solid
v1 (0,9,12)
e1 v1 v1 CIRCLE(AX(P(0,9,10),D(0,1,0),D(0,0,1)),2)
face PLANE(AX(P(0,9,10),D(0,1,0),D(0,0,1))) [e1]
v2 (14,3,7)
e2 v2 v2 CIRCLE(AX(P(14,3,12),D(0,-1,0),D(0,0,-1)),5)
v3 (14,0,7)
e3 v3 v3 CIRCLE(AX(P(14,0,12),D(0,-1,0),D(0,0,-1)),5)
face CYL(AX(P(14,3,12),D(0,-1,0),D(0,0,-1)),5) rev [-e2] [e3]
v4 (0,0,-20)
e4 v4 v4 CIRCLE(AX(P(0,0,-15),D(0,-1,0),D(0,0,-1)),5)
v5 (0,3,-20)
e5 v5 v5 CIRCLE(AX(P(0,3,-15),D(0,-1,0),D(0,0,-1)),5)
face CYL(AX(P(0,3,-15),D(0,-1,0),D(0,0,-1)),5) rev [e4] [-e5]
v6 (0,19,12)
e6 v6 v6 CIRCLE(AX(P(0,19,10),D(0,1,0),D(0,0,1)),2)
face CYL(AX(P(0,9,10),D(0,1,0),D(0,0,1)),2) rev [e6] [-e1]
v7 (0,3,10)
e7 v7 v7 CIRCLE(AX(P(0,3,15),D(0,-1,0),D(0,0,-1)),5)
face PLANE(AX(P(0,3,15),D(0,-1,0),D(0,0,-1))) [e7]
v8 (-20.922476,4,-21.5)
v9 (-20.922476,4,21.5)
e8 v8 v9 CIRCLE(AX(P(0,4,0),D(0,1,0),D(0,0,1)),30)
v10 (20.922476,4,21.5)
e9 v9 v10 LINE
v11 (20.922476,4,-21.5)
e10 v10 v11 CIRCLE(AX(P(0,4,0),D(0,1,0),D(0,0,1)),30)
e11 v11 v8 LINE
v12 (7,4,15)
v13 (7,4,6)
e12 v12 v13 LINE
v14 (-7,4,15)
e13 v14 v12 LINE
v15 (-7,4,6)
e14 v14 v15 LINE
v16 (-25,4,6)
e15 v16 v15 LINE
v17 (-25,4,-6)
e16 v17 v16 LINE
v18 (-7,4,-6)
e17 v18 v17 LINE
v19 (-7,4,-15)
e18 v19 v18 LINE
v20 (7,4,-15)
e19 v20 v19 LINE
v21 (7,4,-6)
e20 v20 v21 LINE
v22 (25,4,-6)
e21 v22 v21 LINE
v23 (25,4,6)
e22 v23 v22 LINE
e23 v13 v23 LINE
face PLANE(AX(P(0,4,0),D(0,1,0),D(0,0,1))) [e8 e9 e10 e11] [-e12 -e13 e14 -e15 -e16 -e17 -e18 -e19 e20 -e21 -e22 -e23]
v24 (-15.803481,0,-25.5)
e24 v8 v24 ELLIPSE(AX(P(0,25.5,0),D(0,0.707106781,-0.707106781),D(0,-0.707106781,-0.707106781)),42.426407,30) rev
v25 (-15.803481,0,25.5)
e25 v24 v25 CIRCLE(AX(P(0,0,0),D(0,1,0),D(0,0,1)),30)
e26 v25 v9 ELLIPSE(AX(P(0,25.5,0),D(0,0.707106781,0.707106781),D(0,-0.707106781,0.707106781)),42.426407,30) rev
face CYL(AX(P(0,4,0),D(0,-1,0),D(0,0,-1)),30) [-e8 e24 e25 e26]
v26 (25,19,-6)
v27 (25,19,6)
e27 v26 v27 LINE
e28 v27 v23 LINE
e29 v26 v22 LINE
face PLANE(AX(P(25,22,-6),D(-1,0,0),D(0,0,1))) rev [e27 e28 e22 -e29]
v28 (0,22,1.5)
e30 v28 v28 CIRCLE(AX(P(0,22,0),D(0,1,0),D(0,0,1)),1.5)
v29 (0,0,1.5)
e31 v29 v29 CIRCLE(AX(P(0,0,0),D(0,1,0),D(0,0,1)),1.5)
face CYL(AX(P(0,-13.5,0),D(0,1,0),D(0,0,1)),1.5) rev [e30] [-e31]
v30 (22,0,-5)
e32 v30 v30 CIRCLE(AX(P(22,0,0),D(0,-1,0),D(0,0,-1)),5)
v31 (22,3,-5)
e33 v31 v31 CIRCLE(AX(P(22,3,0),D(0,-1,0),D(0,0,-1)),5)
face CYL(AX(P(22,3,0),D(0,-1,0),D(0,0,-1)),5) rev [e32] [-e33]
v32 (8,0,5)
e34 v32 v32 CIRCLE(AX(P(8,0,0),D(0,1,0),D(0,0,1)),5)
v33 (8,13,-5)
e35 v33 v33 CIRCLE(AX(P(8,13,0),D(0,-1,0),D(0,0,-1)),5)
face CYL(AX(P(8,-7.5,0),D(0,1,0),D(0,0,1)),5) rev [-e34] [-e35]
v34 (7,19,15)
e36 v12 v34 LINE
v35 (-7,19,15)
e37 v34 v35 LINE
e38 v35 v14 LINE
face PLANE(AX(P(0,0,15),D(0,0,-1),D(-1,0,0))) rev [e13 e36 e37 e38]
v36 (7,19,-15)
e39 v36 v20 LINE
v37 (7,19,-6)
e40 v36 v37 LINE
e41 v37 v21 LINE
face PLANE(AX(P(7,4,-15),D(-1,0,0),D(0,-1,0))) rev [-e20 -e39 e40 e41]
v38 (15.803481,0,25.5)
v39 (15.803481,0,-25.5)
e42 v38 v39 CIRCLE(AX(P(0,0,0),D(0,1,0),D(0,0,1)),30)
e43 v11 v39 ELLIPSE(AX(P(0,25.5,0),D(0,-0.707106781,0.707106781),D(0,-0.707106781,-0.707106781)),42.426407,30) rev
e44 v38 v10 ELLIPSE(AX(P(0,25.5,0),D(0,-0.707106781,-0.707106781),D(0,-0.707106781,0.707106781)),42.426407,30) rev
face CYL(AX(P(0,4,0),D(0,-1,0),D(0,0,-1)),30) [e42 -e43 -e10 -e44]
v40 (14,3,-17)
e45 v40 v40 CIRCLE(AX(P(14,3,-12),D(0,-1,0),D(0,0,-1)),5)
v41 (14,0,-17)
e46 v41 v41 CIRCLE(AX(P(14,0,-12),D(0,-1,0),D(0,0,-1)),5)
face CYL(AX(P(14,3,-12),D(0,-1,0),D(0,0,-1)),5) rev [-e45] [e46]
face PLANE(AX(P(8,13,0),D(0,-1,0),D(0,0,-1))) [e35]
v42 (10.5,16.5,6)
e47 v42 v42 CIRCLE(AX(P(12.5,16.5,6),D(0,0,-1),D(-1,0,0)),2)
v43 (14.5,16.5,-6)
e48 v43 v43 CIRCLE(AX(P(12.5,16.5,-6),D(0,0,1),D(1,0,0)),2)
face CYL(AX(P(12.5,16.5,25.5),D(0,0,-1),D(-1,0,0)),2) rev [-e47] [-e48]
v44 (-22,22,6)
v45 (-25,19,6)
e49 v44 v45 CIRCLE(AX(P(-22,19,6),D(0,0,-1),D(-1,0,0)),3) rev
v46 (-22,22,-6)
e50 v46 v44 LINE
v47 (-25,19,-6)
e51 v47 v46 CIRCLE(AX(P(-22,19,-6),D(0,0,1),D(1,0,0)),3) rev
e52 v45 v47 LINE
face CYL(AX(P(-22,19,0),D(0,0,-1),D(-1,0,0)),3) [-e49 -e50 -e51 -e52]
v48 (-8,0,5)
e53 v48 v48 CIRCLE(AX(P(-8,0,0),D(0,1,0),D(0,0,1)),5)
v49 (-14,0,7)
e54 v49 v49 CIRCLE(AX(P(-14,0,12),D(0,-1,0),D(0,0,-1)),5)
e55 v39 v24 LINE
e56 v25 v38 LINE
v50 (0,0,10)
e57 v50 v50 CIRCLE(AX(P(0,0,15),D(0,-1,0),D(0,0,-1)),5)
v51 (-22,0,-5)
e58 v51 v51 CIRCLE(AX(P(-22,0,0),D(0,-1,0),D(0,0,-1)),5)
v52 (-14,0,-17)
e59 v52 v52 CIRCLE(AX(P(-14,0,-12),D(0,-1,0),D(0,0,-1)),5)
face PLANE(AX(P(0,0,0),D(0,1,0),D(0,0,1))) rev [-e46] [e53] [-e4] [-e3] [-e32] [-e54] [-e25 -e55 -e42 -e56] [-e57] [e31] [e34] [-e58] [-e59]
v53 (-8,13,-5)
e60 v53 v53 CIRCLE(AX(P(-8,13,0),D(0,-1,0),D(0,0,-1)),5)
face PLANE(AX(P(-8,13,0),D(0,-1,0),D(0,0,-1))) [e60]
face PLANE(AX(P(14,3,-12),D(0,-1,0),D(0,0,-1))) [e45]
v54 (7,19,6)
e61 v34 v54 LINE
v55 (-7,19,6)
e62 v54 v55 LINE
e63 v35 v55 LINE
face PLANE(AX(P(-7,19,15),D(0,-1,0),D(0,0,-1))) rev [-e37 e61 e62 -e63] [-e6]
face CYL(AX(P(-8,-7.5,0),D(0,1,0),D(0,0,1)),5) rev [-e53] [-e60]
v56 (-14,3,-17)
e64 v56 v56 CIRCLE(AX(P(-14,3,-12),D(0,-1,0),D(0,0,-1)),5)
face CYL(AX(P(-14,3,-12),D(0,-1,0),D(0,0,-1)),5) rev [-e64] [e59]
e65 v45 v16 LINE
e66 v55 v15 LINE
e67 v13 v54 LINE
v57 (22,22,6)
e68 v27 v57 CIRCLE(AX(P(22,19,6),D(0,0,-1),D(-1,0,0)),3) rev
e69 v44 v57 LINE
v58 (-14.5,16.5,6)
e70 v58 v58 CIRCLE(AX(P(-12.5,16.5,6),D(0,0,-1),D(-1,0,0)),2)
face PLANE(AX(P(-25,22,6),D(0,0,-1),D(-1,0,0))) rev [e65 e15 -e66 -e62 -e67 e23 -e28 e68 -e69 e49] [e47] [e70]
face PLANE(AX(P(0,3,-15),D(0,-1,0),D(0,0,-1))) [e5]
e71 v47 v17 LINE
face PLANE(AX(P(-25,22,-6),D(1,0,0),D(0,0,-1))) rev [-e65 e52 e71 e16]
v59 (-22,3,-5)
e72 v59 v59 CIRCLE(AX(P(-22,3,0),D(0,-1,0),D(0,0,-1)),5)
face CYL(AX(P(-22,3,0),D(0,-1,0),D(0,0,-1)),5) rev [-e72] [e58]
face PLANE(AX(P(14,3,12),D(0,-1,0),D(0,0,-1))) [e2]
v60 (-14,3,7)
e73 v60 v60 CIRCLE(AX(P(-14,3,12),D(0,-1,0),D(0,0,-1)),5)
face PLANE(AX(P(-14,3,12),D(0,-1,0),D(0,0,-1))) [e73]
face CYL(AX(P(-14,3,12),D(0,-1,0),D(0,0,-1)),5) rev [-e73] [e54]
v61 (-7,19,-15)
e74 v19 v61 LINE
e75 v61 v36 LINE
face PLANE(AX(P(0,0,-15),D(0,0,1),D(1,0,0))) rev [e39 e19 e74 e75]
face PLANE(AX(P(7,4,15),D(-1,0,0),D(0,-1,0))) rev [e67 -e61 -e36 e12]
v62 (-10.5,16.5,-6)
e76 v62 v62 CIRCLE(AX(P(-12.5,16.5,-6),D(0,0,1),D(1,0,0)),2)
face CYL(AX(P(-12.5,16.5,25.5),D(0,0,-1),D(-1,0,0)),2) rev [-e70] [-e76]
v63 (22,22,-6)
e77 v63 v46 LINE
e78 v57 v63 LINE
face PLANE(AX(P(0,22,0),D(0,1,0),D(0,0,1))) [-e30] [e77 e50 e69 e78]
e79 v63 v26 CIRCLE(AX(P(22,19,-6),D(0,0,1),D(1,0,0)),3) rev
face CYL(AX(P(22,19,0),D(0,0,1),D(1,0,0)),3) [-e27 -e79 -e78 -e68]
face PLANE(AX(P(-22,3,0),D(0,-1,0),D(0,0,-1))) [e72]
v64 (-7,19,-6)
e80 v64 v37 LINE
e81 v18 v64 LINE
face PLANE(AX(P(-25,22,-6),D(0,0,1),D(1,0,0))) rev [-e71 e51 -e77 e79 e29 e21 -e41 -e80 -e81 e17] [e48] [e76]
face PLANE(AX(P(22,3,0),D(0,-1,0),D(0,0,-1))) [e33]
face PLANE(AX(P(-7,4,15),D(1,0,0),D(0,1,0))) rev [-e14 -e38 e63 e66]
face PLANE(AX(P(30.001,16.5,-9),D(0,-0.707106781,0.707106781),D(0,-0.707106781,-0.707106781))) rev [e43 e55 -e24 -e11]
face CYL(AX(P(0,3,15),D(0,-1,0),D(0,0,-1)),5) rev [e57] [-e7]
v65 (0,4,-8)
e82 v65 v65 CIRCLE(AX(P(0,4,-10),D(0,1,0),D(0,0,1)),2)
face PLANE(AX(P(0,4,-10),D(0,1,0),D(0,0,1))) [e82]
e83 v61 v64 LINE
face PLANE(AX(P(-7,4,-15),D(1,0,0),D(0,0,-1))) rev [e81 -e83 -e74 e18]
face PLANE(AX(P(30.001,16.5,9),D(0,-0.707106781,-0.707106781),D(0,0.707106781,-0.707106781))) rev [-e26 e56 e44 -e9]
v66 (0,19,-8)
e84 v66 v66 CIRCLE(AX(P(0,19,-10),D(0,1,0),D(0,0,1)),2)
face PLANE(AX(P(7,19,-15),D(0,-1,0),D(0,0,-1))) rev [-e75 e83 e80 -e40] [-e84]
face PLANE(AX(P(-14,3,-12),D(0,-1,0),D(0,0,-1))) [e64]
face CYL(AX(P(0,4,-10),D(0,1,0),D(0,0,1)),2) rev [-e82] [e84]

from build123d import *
from build123d.topology import SkipClean

# Parameters (mm, degrees)
SKETCH1_R                            = 30
BOSS_EXTRUDE1_DEPTH                  = 4
BOSS_EXTRUDE2_REACH                  = 44.615
BOSS_EXTRUDE2_END_RADIUS             = 30
BOSS_EXTRUDE2_DIRECTION_2_REACH      = 44.615
BOSS_EXTRUDE2_DIRECTION_2_END_RADIUS = 30
SKETCH3_OUTSIDE_W                    = 78.092
SKETCH3_OUTSIDE_H                    = 69.092
SKETCH3_OUTSIDE_R                    = 21.5
CUT_EXTRUDE2_DEPTH                   = 12.5
BOSS_EXTRUDE3_DEPTH                  = 18
BOSS_EXTRUDE4_DEPTH                  = 15
BOSS_EXTRUDE5_DEPTH                  = 15
CUT_EXTRUDE3_DEPTH                   = 44.292609069
CUT_EXTRUDE3_DEPTH_BACK              = 44.292609069
SKETCH8_R                            = 2
CUT_EXTRUDE8_DEPTH                   = 48.077064479
CUT_EXTRUDE8_DEPTH_BACK              = 48.077064479
CUT_EXTRUDE9_DEPTH                   = 59.659818207
CUT_EXTRUDE11_DEPTH                  = 20
CUT_EXTRUDE12_DEPTH                  = 20
CUT_EXTRUDE13_DEPTH                  = 20
CUT_EXTRUDE14_DEPTH                  = 44.292609069
CUT_EXTRUDE14_DEPTH_BACK             = 44.292609069
SKETCH25_W                           = 66.075437062
SKETCH25_H                           = 20.142243048
SKETCH26_R                           = 5
CUT_EXTRUDE15_DEPTH                  = 24
SKETCH27_R                           = 1.5
CUT_EXTRUDE16_DEPTH                  = 30
SKETCH28_R                           = 5
CUT_EXTRUDE17_DEPTH                  = 3
CUT_EXTRUDE18_DEPTH                  = 43.690748412
CUT_EXTRUDE18_DEPTH_BACK             = 43.690748412
SKETCH29_W                           = 43.412566799
SKETCH29_H                           = 13.326200919
SKETCH32_W                           = 50
SKETCH32_H                           = 12
BOSS_EXTRUDE6_DEPTH                  = 18
SKETCH35_W                           = 14
SKETCH35_H                           = 15
BOSS_EXTRUDE7_DEPTH                  = 9
CUT_EXTRUDE19_DEPTH                  = 49.746794766
CUT_EXTRUDE19_DEPTH_BACK             = 49.746794766
SKETCH37_R                           = 2
SKETCH36_R                           = 2
CUT_EXTRUDE20_DEPTH                  = 15
SKETCH39_W                           = 14
SKETCH39_H                           = 15
BOSS_EXTRUDE8_DEPTH                  = 9
SKETCH40_R                           = 2
CUT_EXTRUDE21_DEPTH                  = 10
CUT_EXTRUDE22_START                  = -9
SKETCH41_R                           = 5
CUT_EXTRUDE22_DEPTH                  = 9
CUT_EXTRUDE23_START                  = -9
SKETCH42_R                           = 5
CUT_EXTRUDE23_DEPTH                  = 9
FILLET1_R                            = 3
CUT_EXTRUDE24_START                  = -19
CUT_EXTRUDE24_OUTLINE_R              = 1.5
CUT_EXTRUDE24_DEPTH                  = 19
CUT_EXTRUDE24_START_2                = -7
CUT_EXTRUDE24_2_DEPTH                = 14


with BuildPart() as part:
    # Sketch1 → Boss-Extrude1 (new body)
    with BuildSketch(Plane(origin=(0, 0, 0), x_dir=(1, 0, 0), z_dir=(0, 1, 0))):
        with Locations(Location((0, 0, 0), (0, 0, 270))):
            Circle(SKETCH1_R)
    extrude(amount=BOSS_EXTRUDE1_DEPTH)

    # Boss-Extrude2: up to this cylinder (the profile starts inside it)
    with SkipClean():  # the faces are left unmerged after this step: merging them gives an invalid solid
        boss_extrude2_end = Plane(origin=(0, 9.396175, 0), z_dir=(0, -1, 0)) * Cylinder(BOSS_EXTRUDE2_END_RADIUS, 150.23, mode=Mode.PRIVATE)
        # Sketch2 → Boss-Extrude2 (add, up to the surface)
        with BuildSketch(Plane(origin=(0, 0, 0), x_dir=(0, 0, -1), z_dir=(1, 0, 0)), mode=Mode.PRIVATE) as boss_extrude2_sk1:
            Polygon((0, 4), (21.5, 4), (9, 16.5), (-9, 16.5), (-21.5, 4), align=None)
        boss_extrude2_tool1 = extrude(boss_extrude2_sk1.sketch, amount=BOSS_EXTRUDE2_REACH, mode=Mode.PRIVATE) & boss_extrude2_end
        add(boss_extrude2_tool1.solids().sort_by_distance((0, 9.396175, 0))[0])

    # Boss-Extrude2 direction 2: up to this cylinder (the profile starts inside it)
    with SkipClean():  # the faces are left unmerged after this step: merging them gives an invalid solid
        boss_extrude2_direction_2_end = Plane(origin=(0, 9.396175, 0), z_dir=(0, -1, 0)) * Cylinder(BOSS_EXTRUDE2_DIRECTION_2_END_RADIUS, 150.23, mode=Mode.PRIVATE)
        # Sketch2 → Boss-Extrude2 direction 2 (add, up to the surface)
        with BuildSketch(Plane(origin=(0, 0, 0), x_dir=(0, 0, -1), z_dir=(1, 0, 0)), mode=Mode.PRIVATE) as boss_extrude2_direction_2_sk1:
            Polygon((0, 4), (21.5, 4), (9, 16.5), (-9, 16.5), (-21.5, 4), align=None)
        boss_extrude2_direction_2_tool1 = extrude(boss_extrude2_direction_2_sk1.sketch, amount=-BOSS_EXTRUDE2_DIRECTION_2_REACH, mode=Mode.PRIVATE) & boss_extrude2_direction_2_end
        add(boss_extrude2_direction_2_tool1.solids().sort_by_distance((0, 9.396175, 0))[0])

    # SurfaceCut1
    split(bisect_by=Plane(origin=(0, 12.75, -12.75), x_dir=(1, 0, 0), z_dir=(0, 0.7071067811865558, -0.7071067811865392)), keep=Keep.BOTTOM)

    # SurfaceCut2
    split(bisect_by=Plane(origin=(0, 12.75, 12.75), x_dir=(1, 0, 0), z_dir=(0, 0.7071067811865509, 0.7071067811865442)), keep=Keep.BOTTOM)

    # Sketch3 outside → Cut-Extrude2 (cut)
    with BuildSketch(Plane(origin=(0, 4, 0), x_dir=(1, 0, 0), z_dir=(0, 1, 0))):
        Rectangle(SKETCH3_OUTSIDE_W, SKETCH3_OUTSIDE_H)
        Circle(SKETCH3_OUTSIDE_R, mode=Mode.SUBTRACT)
    extrude(amount=CUT_EXTRUDE2_DEPTH, mode=Mode.SUBTRACT)

    # Sketch5 → Boss-Extrude3 (add)
    with BuildSketch(Plane(origin=(0, 0, 0), x_dir=(-1, 0, 0), z_dir=(0, -1, 0))):
        Polygon((0, -6), (-17.5, -6), (-17.5, 6), (17.5, 6), (17.5, -6), align=None)
    extrude(amount=BOSS_EXTRUDE3_DEPTH)

    # Sketch6 → Boss-Extrude4 (add)
    with BuildSketch(Plane.XZ):
        Polygon((0, 15), (7, 15), (7, 6), (-7, 6), (-7, 15), align=None)
    extrude(amount=BOSS_EXTRUDE4_DEPTH)

    # Sketch7 → Boss-Extrude5 (add)
    with BuildSketch(Plane.XZ):
        Polygon((0, -15), (7, -15), (7, -6), (-7, -6), (-7, -15), align=None)
    extrude(amount=BOSS_EXTRUDE5_DEPTH)

    # Sketch8 → Cut-Extrude3 (cut, two sides: drawn at the far end of the back side and taken through both)
    with BuildSketch(Plane.XY.offset(-CUT_EXTRUDE3_DEPTH_BACK)):
        with Locations((-12.5, -12.5)):
            Circle(SKETCH8_R)
        with Locations((12.5, -12.5)):
            Circle(SKETCH8_R)
    extrude(amount=CUT_EXTRUDE3_DEPTH + CUT_EXTRUDE3_DEPTH_BACK, mode=Mode.SUBTRACT)

    # Sketch16 → Cut-Extrude8 (cut, two sides: drawn at the far end of the back side and taken through both)
    with BuildSketch(Plane.XY.offset(6).offset(-CUT_EXTRUDE8_DEPTH_BACK)):
        Polygon((17.5, -18), (17.5, -14.5), (14, -18), align=None)
        Polygon((-17.5, -18), (-14, -18), (-17.5, -14.5), align=None)
    extrude(amount=CUT_EXTRUDE8_DEPTH + CUT_EXTRUDE8_DEPTH_BACK, mode=Mode.SUBTRACT)

    # Sketch17 → Cut-Extrude9 (cut, through all)
    with BuildSketch(Plane(origin=(10.365975269, -9.674910251, -8.062425209), x_dir=(-0.3613483622370374, 0.337258471421235, -0.8693009171531012), z_dir=(0.6355070151731325, -0.5931398808282571, -0.49428323402354774))):
        Polygon((-2.372510104, -6.189601271), (7.980636686, -0.706686759), (7.980636686, -10.965829024), align=None)
    extrude(amount=CUT_EXTRUDE9_DEPTH, mode=Mode.SUBTRACT)

    # Sketch19 → Cut-Extrude11 (cut)
    with BuildSketch(Plane(origin=(-10.365975269, -9.674910251, -8.062425209), x_dir=(0.3613483622370374, 0.33725847142123494, -0.8693009171531012), z_dir=(0.6355070151731324, 0.5931398808282571, 0.4942832340235476))):
        Polygon((-2.372510104, -6.189601271), (7.980636686, -10.965829024), (7.980636686, -0.706686759), align=None)
    extrude(amount=-CUT_EXTRUDE11_DEPTH, mode=Mode.SUBTRACT)

    # Sketch20 → Cut-Extrude12 (cut)
    with BuildSketch(Plane(origin=(-10.365975269, -9.674910251, 8.062425209), x_dir=(-0.3613483622370374, -0.3372584714212349, -0.8693009171531013), z_dir=(0.6355070151731326, 0.593139880828257, -0.49428323402354757))):
        Polygon((2.372510104, -6.189601271), (-7.980636686, -0.706686759), (-7.980636686, -10.965829024), align=None)
    extrude(amount=-CUT_EXTRUDE12_DEPTH, mode=Mode.SUBTRACT)

    # Sketch21 → Cut-Extrude13 (cut)
    with BuildSketch(Plane(origin=(10.365975269, -9.674910251, 8.062425209), x_dir=(-0.3613483622370374, 0.3372584714212349, 0.8693009171531013), z_dir=(-0.6355070151731326, 0.593139880828257, -0.49428323402354757))):
        Polygon((-2.372510104, -6.189601271), (7.980636686, -0.706686759), (7.980636686, -10.965829024), align=None)
    extrude(amount=-CUT_EXTRUDE13_DEPTH, mode=Mode.SUBTRACT)

    # Sketch25 → Cut-Extrude14 (cut, two sides: drawn at the far end of the back side and taken through both)
    with BuildSketch(Plane.XY.offset(-CUT_EXTRUDE14_DEPTH_BACK)):
        with Locations((0, -10.071121524)):
            Rectangle(SKETCH25_W, SKETCH25_H)
    extrude(amount=CUT_EXTRUDE14_DEPTH + CUT_EXTRUDE14_DEPTH_BACK, mode=Mode.SUBTRACT)

    # Sketch26 → Cut-Extrude15 (cut)
    with BuildSketch(Plane(origin=(0, 16.5, 0), x_dir=(1, 0, 0), z_dir=(0, 1, 0))):
        with Locations(Location((-8, 0, 0), (0, 0, 270))):
            Circle(SKETCH26_R)
        with Locations(Location((8, 0, 0), (0, 0, 270))):
            Circle(SKETCH26_R)
    extrude(amount=-CUT_EXTRUDE15_DEPTH, mode=Mode.SUBTRACT)

    # Sketch27 → Cut-Extrude16 (cut)
    with BuildSketch(Plane(origin=(0, 16.5, 0), x_dir=(1, 0, 0), z_dir=(0, 1, 0))):
        with Locations(Location((0, 0, 0), (0, 0, 270))):
            Circle(SKETCH27_R)
    extrude(amount=-CUT_EXTRUDE16_DEPTH, mode=Mode.SUBTRACT)

    # Sketch28 → Cut-Extrude17 (cut)
    with BuildSketch(Plane.XZ):
        with Locations(Location((0, -15, 0), (0, 0, 270))):
            Circle(SKETCH28_R)
        with Locations(Location((22, 0, 0), (0, 0, 270))):
            Circle(SKETCH28_R)
        with Locations(Location((0, 15, 0), (0, 0, 270))):
            Circle(SKETCH28_R)
        with Locations(Location((-22, 0, 0), (0, 0, 270))):
            Circle(SKETCH28_R)
        with Locations(Location((-14, 12, 0), (0, 0, 270))):
            Circle(SKETCH28_R)
        with Locations(Location((14, 12, 0), (0, 0, 270))):
            Circle(SKETCH28_R)
        with Locations(Location((14, -12, 0), (0, 0, 270))):
            Circle(SKETCH28_R)
        with Locations(Location((-14, -12, 0), (0, 0, 270))):
            Circle(SKETCH28_R)
    extrude(amount=-CUT_EXTRUDE17_DEPTH, mode=Mode.SUBTRACT)

    # Sketch29 → Cut-Extrude18 (cut, two sides: drawn at the far end of the back side and taken through both)
    with BuildSketch(Plane(origin=(0, 0, 0), x_dir=(0, 0, -1), z_dir=(1, 0, 0)).offset(-CUT_EXTRUDE18_DEPTH_BACK)):
        with Locations((0.2062834, 10.66310046)):
            Rectangle(SKETCH29_W, SKETCH29_H)
    extrude(amount=CUT_EXTRUDE18_DEPTH + CUT_EXTRUDE18_DEPTH_BACK, mode=Mode.SUBTRACT)

    # Sketch32 → Boss-Extrude6 (add)
    with BuildSketch(Plane(origin=(0, 4, 0), x_dir=(1, 0, 0), z_dir=(0, 1, 0))):
        Rectangle(SKETCH32_W, SKETCH32_H)
    extrude(amount=BOSS_EXTRUDE6_DEPTH)

    # Sketch35 → Boss-Extrude7 (add)
    with BuildSketch(Plane(origin=(0, 0, -6), x_dir=(-1, 0, 0), z_dir=(0, 0, -1))):
        with Locations((0, 11.5)):
            Rectangle(SKETCH35_W, SKETCH35_H)
    extrude(amount=BOSS_EXTRUDE7_DEPTH)

    # Sketch37 → Cut-Extrude19 (cut, two sides: drawn at the far end of the back side and taken through both)
    with BuildSketch(Plane(origin=(0, 0, -6), x_dir=(-1, 0, 0), z_dir=(0, 0, -1)).offset(-CUT_EXTRUDE19_DEPTH_BACK)):
        with Locations((-12.5, 16.5)):
            Circle(SKETCH37_R)
        with Locations((12.5, 16.5)):
            Circle(SKETCH37_R)
    extrude(amount=CUT_EXTRUDE19_DEPTH + CUT_EXTRUDE19_DEPTH_BACK, mode=Mode.SUBTRACT)

    # Sketch36 → Cut-Extrude20 (cut)
    with BuildSketch(Plane(origin=(0, 19, 0), x_dir=(1, 0, 0), z_dir=(0, 1, 0))):
        with Locations(Location((0, 10, 0), (0, 0, 270))):
            Circle(SKETCH36_R)
    extrude(amount=-CUT_EXTRUDE20_DEPTH, mode=Mode.SUBTRACT)

    # Sketch39 → Boss-Extrude8 (add)
    with BuildSketch(Plane.XY.offset(6)):
        with Locations((0, 11.5)):
            Rectangle(SKETCH39_W, SKETCH39_H)
    extrude(amount=BOSS_EXTRUDE8_DEPTH)

    # Sketch40 → Cut-Extrude21 (cut)
    with BuildSketch(Plane(origin=(0, 19, 0), x_dir=(1, 0, 0), z_dir=(0, 1, 0))):
        with Locations(Location((0, -10, 0), (0, 0, 270))):
            Circle(SKETCH40_R)
    extrude(amount=-CUT_EXTRUDE21_DEPTH, mode=Mode.SUBTRACT)

    # Sketch41 → Cut-Extrude22 (cut)
    with BuildSketch(Plane.XZ.offset(-4).offset(CUT_EXTRUDE22_START)):
        with Locations(Location((-8, 0, 0), (0, 0, 90))):
            Circle(SKETCH41_R)
    extrude(amount=CUT_EXTRUDE22_DEPTH, mode=Mode.SUBTRACT)

    # Sketch42 → Cut-Extrude23 (cut)
    with BuildSketch(Plane.XZ.offset(-4).offset(CUT_EXTRUDE23_START)):
        with Locations(Location((8, 0, 0), (0, 0, 90))):
            Circle(SKETCH42_R)
    extrude(amount=CUT_EXTRUDE23_DEPTH, mode=Mode.SUBTRACT)

    # Fillet1
    fillet1_edges = [part.edges().sort_by_distance(p)[0] for p in [
        (25, 22, 0),
    ]]
    fillet(fillet1_edges, radius=FILLET1_R)

    # Cut-Extrude24: read off the stored shape, not the designer's step
    # Cut-Extrude24 outline → Cut-Extrude24 (cut)
    with BuildSketch(Plane.XZ.offset(-4).offset(CUT_EXTRUDE24_START)):
        Circle(CUT_EXTRUDE24_OUTLINE_R)
    extrude(amount=CUT_EXTRUDE24_DEPTH, mode=Mode.SUBTRACT)

    # Cut-Extrude24 2 outline → Cut-Extrude24 2 (cut)
    with BuildSketch(Plane.XY.offset(CUT_EXTRUDE24_START_2)):
        with BuildLine():
            Line((-25, 22), (-25, 19))
            ThreePointArc((-25, 19), (-24.121320344, 21.121320344), (-22, 22))
            Line((-22, 22), (-25, 22))
        make_face()
    extrude(amount=CUT_EXTRUDE24_2_DEPTH, mode=Mode.SUBTRACT)


solid = part.part
